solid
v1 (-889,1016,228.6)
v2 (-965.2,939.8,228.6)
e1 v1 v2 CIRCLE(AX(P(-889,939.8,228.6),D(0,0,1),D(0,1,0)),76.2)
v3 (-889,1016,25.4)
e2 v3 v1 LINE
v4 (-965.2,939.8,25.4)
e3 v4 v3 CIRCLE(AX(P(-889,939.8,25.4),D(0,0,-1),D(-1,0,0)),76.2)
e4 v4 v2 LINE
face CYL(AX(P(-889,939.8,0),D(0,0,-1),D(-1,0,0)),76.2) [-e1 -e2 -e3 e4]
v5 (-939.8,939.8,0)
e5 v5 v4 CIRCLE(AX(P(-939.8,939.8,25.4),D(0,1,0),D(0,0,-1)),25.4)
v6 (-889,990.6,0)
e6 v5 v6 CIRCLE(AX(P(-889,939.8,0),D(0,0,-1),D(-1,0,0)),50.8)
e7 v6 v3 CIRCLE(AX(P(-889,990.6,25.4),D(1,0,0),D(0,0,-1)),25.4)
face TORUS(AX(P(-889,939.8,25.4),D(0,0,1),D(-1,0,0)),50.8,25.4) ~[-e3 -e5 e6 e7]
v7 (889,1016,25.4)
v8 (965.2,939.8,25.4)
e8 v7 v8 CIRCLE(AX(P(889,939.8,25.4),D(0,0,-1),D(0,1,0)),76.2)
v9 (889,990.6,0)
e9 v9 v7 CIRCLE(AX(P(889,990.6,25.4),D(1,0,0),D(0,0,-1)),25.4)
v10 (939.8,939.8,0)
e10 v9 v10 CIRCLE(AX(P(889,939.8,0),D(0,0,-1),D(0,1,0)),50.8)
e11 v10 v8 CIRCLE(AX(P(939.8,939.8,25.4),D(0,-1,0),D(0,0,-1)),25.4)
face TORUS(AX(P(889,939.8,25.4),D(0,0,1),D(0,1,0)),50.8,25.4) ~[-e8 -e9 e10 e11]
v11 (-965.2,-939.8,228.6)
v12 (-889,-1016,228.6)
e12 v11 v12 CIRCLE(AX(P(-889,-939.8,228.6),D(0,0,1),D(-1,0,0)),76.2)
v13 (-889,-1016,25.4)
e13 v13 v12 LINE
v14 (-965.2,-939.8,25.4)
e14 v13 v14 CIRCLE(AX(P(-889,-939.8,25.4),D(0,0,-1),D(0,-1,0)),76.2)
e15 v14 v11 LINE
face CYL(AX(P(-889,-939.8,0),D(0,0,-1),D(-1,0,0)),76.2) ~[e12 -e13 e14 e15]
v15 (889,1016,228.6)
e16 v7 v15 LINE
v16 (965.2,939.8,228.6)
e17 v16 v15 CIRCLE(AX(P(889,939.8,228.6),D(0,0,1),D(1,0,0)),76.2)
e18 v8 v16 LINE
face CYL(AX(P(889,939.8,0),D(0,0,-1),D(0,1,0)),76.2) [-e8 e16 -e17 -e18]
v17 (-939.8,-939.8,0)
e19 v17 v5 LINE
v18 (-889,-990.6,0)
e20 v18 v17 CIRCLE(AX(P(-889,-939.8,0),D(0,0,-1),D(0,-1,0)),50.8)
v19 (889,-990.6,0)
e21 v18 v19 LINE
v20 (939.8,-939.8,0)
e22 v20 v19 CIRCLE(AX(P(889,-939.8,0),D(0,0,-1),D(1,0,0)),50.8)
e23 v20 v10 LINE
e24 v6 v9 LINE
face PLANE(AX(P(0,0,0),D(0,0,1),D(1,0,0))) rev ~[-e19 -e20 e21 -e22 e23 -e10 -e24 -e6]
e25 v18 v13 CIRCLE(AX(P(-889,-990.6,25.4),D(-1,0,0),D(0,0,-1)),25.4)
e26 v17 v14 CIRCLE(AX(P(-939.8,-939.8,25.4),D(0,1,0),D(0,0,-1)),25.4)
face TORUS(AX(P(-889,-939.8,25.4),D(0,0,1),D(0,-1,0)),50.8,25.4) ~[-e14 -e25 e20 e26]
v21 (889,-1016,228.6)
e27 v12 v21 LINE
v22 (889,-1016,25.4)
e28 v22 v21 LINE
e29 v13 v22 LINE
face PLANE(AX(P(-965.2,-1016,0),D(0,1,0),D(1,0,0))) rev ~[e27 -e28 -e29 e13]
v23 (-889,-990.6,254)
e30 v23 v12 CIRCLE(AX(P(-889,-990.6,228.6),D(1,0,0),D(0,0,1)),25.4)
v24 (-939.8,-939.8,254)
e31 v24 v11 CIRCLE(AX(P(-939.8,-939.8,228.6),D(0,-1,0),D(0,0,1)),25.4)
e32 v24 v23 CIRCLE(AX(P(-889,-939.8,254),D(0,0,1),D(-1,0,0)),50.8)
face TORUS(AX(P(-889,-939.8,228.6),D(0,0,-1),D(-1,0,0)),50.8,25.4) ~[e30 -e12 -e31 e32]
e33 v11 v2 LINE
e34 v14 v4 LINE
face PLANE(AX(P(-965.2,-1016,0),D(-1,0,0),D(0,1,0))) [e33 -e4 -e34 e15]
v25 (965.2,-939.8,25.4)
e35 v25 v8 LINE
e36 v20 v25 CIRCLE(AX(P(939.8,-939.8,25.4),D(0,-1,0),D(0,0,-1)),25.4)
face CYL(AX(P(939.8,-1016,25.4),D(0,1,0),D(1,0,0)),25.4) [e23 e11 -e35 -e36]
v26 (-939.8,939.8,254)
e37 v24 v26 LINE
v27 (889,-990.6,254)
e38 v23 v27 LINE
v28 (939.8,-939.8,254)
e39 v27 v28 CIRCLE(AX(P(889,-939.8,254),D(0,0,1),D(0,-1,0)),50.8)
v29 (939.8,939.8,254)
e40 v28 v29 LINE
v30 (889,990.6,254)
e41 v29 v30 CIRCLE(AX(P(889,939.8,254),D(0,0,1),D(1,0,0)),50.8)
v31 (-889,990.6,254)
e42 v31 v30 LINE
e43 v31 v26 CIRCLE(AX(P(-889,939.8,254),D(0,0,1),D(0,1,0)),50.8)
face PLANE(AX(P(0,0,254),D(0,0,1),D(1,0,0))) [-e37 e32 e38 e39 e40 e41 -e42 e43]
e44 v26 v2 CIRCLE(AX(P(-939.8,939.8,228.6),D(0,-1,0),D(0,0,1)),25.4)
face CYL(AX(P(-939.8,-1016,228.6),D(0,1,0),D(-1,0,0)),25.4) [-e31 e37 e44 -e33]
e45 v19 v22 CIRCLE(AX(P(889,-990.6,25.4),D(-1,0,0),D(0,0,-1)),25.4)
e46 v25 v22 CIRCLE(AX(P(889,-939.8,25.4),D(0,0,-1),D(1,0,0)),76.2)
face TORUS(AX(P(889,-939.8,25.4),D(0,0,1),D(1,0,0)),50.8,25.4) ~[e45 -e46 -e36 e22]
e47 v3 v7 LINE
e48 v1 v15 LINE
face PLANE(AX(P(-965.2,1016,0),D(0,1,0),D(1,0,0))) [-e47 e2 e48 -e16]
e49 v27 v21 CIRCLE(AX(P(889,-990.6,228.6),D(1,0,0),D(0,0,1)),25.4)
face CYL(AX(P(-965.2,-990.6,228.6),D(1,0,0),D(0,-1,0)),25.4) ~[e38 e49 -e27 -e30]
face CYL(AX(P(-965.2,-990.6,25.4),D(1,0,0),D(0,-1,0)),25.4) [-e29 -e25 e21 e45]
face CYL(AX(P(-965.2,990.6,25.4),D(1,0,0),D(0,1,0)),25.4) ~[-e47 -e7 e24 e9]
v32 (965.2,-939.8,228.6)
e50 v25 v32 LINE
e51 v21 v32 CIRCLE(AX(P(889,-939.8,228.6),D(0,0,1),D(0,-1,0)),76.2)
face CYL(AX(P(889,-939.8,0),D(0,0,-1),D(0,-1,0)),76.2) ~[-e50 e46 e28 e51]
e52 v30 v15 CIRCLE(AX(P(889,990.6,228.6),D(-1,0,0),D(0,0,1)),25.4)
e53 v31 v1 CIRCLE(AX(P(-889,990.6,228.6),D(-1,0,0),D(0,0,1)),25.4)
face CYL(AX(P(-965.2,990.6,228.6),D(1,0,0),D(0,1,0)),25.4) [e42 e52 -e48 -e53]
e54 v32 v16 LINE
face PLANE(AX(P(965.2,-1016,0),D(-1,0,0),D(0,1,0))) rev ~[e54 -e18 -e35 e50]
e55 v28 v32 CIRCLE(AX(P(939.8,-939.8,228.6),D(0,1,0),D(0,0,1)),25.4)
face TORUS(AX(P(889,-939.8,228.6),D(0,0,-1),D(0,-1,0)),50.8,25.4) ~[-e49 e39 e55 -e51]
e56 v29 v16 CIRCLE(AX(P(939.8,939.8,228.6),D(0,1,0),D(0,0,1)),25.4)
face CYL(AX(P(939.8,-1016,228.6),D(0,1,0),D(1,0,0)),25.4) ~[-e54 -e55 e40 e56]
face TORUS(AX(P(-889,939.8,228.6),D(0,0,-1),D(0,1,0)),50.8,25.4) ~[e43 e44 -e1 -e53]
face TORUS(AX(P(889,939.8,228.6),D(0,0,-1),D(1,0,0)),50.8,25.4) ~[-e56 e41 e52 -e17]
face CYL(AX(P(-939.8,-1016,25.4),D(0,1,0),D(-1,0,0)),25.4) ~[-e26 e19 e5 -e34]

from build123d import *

# Parameters (mm, degrees)
F0_W         = 1930.4
F0_H         = 2032
F1_DEPTH     = 254
F2_R         = 25.4
F3_T1_DEPTH  = 254
F3_T4_ANGLE  = 90
F3_T6_ANGLE  = 90
F3_T8_ANGLE  = 90
F3_T10_ANGLE = 90
F3_T12_ANGLE = 90
F3_T14_ANGLE = 90
F3_T16_ANGLE = 90
F3_T18_ANGLE = 90


# Not quite as in the source:
# - a fillet or chamfer that OpenCascade refuses, or shapes differently, is made with other operations: its cross-section is extruded or revolved along the edge and cut away or added


with BuildPart() as f1:
    # F0 (on Top) → F1 (new body)
    with BuildSketch(Plane.XY):
        Rectangle(F0_W, F0_H)
    extrude(amount=F1_DEPTH)

    # F2
    f2_edges = [f1.edges().sort_by_distance(p)[0] for p in [
        (0, -1016, 254),
        (965.2, 0, 254),
        (0, 1016, 254),
        (-965.2, 0, 254),
        (0, -1016, 0),
        (965.2, 0, 0),
        (0, 1016, 0),
        (-965.2, 0, 0),
    ]]
    fillet(f2_edges, radius=F2_R)

    # F3: fillet of radius 76.2 on 4 edges, made by hand

    # F3_s2 → F3_t1 (cut)
    with BuildSketch(Plane.XY):
        with BuildLine():
            ThreePointArc((889, -1016), (942.8815367264, -993.6815367264), (965.2, -939.8))
            Line((965.2, -939.8), (965.2, -1016))
            Line((965.2, -1016), (889, -1016))
        make_face()
        with BuildLine():
            ThreePointArc((889, 1016), (942.8815367264, 993.6815367264), (965.2, 939.8))
            Line((965.2, 939.8), (965.2, 1016))
            Line((965.2, 1016), (889, 1016))
        make_face()
        with BuildLine():
            ThreePointArc((-965.2, -939.8), (-942.8815367264, -993.6815367264), (-889, -1016))
            Line((-889, -1016), (-965.2, -1016))
            Line((-965.2, -1016), (-965.2, -939.8))
        make_face()
        with BuildLine():
            ThreePointArc((-965.2, 939.8), (-942.8815367264, 993.6815367264), (-889, 1016))
            Line((-889, 1016), (-965.2, 1016))
            Line((-965.2, 1016), (-965.2, 939.8))
        make_face()
    extrude(amount=F3_T1_DEPTH, mode=Mode.SUBTRACT)

    # F3_s3 → F3_t4 (revolve, cut)
    with BuildSketch(Plane.XZ.offset(-939.8)):
        with BuildLine():
            ThreePointArc((-939.8, 0), (-957.7605122421, 7.4394877579), (-965.2, 25.4))
            Line((-965.2, 25.4), (-965.2, 0))
            Line((-965.2, 0), (-939.8, 0))
        make_face()
    revolve(axis=Axis((-889, 939.8, 0), (0, 0, -1)), revolution_arc=F3_T4_ANGLE, mode=Mode.SUBTRACT)

    # F3_s5 → F3_t6 (revolve, cut)
    with BuildSketch(Plane.YZ.offset(-889)):
        with BuildLine():
            ThreePointArc((990.6, 254), (1008.5605122421, 246.5605122421), (1016, 228.6))
            Line((1016, 228.6), (1016, 254))
            Line((1016, 254), (990.6, 254))
        make_face()
    revolve(axis=Axis((-889, 939.8, 254), (0, 0, 1)), revolution_arc=F3_T6_ANGLE, mode=Mode.SUBTRACT)

    # F3_s7 → F3_t8 (revolve, cut)
    with BuildSketch(Plane.YZ.offset(-889)):
        with BuildLine():
            ThreePointArc((-990.6, 0), (-1008.5605122421, 7.4394877579), (-1016, 25.4))
            Line((-1016, 25.4), (-1016, 0))
            Line((-1016, 0), (-990.6, 0))
        make_face()
    revolve(axis=Axis((-889, -939.8, 0), (0, 0, -1)), revolution_arc=F3_T8_ANGLE, mode=Mode.SUBTRACT)

    # F3_s9 → F3_t10 (revolve, cut)
    with BuildSketch(Plane.XZ.offset(939.8)):
        with BuildLine():
            ThreePointArc((-939.8, 254), (-957.7605122421, 246.5605122421), (-965.2, 228.6))
            Line((-965.2, 228.6), (-965.2, 254))
            Line((-965.2, 254), (-939.8, 254))
        make_face()
    revolve(axis=Axis((-889, -939.8, 254), (0, 0, 1)), revolution_arc=F3_T10_ANGLE, mode=Mode.SUBTRACT)

    # F3_s11 → F3_t12 (revolve, cut)
    with BuildSketch(Plane.YZ.offset(889)):
        with BuildLine():
            ThreePointArc((990.6, 0), (1008.5605122421, 7.4394877579), (1016, 25.4))
            Line((1016, 25.4), (1016, 0))
            Line((1016, 0), (990.6, 0))
        make_face()
    revolve(axis=Axis((889, 939.8, 0), (0, 0, -1)), revolution_arc=F3_T12_ANGLE, mode=Mode.SUBTRACT)

    # F3_s13 → F3_t14 (revolve, cut)
    with BuildSketch(Plane.XZ.offset(-939.8)):
        with BuildLine():
            ThreePointArc((939.8, 254), (957.7605122421, 246.5605122421), (965.2, 228.6))
            Line((965.2, 228.6), (965.2, 254))
            Line((965.2, 254), (939.8, 254))
        make_face()
    revolve(axis=Axis((889, 939.8, 254), (0, 0, 1)), revolution_arc=F3_T14_ANGLE, mode=Mode.SUBTRACT)

    # F3_s15 → F3_t16 (revolve, cut)
    with BuildSketch(Plane.XZ.offset(939.8)):
        with BuildLine():
            ThreePointArc((939.8, 0), (957.7605122421, 7.4394877579), (965.2, 25.4))
            Line((965.2, 25.4), (965.2, 0))
            Line((965.2, 0), (939.8, 0))
        make_face()
    revolve(axis=Axis((889, -939.8, 0), (0, 0, -1)), revolution_arc=F3_T16_ANGLE, mode=Mode.SUBTRACT)

    # F3_s17 → F3_t18 (revolve, cut)
    with BuildSketch(Plane.YZ.offset(889)):
        with BuildLine():
            ThreePointArc((-990.6, 254), (-1008.5605122421, 246.5605122421), (-1016, 228.6))
            Line((-1016, 228.6), (-1016, 254))
            Line((-1016, 254), (-990.6, 254))
        make_face()
    revolve(axis=Axis((889, -939.8, 254), (0, 0, 1)), revolution_arc=F3_T18_ANGLE, mode=Mode.SUBTRACT)


solid = f1.part
